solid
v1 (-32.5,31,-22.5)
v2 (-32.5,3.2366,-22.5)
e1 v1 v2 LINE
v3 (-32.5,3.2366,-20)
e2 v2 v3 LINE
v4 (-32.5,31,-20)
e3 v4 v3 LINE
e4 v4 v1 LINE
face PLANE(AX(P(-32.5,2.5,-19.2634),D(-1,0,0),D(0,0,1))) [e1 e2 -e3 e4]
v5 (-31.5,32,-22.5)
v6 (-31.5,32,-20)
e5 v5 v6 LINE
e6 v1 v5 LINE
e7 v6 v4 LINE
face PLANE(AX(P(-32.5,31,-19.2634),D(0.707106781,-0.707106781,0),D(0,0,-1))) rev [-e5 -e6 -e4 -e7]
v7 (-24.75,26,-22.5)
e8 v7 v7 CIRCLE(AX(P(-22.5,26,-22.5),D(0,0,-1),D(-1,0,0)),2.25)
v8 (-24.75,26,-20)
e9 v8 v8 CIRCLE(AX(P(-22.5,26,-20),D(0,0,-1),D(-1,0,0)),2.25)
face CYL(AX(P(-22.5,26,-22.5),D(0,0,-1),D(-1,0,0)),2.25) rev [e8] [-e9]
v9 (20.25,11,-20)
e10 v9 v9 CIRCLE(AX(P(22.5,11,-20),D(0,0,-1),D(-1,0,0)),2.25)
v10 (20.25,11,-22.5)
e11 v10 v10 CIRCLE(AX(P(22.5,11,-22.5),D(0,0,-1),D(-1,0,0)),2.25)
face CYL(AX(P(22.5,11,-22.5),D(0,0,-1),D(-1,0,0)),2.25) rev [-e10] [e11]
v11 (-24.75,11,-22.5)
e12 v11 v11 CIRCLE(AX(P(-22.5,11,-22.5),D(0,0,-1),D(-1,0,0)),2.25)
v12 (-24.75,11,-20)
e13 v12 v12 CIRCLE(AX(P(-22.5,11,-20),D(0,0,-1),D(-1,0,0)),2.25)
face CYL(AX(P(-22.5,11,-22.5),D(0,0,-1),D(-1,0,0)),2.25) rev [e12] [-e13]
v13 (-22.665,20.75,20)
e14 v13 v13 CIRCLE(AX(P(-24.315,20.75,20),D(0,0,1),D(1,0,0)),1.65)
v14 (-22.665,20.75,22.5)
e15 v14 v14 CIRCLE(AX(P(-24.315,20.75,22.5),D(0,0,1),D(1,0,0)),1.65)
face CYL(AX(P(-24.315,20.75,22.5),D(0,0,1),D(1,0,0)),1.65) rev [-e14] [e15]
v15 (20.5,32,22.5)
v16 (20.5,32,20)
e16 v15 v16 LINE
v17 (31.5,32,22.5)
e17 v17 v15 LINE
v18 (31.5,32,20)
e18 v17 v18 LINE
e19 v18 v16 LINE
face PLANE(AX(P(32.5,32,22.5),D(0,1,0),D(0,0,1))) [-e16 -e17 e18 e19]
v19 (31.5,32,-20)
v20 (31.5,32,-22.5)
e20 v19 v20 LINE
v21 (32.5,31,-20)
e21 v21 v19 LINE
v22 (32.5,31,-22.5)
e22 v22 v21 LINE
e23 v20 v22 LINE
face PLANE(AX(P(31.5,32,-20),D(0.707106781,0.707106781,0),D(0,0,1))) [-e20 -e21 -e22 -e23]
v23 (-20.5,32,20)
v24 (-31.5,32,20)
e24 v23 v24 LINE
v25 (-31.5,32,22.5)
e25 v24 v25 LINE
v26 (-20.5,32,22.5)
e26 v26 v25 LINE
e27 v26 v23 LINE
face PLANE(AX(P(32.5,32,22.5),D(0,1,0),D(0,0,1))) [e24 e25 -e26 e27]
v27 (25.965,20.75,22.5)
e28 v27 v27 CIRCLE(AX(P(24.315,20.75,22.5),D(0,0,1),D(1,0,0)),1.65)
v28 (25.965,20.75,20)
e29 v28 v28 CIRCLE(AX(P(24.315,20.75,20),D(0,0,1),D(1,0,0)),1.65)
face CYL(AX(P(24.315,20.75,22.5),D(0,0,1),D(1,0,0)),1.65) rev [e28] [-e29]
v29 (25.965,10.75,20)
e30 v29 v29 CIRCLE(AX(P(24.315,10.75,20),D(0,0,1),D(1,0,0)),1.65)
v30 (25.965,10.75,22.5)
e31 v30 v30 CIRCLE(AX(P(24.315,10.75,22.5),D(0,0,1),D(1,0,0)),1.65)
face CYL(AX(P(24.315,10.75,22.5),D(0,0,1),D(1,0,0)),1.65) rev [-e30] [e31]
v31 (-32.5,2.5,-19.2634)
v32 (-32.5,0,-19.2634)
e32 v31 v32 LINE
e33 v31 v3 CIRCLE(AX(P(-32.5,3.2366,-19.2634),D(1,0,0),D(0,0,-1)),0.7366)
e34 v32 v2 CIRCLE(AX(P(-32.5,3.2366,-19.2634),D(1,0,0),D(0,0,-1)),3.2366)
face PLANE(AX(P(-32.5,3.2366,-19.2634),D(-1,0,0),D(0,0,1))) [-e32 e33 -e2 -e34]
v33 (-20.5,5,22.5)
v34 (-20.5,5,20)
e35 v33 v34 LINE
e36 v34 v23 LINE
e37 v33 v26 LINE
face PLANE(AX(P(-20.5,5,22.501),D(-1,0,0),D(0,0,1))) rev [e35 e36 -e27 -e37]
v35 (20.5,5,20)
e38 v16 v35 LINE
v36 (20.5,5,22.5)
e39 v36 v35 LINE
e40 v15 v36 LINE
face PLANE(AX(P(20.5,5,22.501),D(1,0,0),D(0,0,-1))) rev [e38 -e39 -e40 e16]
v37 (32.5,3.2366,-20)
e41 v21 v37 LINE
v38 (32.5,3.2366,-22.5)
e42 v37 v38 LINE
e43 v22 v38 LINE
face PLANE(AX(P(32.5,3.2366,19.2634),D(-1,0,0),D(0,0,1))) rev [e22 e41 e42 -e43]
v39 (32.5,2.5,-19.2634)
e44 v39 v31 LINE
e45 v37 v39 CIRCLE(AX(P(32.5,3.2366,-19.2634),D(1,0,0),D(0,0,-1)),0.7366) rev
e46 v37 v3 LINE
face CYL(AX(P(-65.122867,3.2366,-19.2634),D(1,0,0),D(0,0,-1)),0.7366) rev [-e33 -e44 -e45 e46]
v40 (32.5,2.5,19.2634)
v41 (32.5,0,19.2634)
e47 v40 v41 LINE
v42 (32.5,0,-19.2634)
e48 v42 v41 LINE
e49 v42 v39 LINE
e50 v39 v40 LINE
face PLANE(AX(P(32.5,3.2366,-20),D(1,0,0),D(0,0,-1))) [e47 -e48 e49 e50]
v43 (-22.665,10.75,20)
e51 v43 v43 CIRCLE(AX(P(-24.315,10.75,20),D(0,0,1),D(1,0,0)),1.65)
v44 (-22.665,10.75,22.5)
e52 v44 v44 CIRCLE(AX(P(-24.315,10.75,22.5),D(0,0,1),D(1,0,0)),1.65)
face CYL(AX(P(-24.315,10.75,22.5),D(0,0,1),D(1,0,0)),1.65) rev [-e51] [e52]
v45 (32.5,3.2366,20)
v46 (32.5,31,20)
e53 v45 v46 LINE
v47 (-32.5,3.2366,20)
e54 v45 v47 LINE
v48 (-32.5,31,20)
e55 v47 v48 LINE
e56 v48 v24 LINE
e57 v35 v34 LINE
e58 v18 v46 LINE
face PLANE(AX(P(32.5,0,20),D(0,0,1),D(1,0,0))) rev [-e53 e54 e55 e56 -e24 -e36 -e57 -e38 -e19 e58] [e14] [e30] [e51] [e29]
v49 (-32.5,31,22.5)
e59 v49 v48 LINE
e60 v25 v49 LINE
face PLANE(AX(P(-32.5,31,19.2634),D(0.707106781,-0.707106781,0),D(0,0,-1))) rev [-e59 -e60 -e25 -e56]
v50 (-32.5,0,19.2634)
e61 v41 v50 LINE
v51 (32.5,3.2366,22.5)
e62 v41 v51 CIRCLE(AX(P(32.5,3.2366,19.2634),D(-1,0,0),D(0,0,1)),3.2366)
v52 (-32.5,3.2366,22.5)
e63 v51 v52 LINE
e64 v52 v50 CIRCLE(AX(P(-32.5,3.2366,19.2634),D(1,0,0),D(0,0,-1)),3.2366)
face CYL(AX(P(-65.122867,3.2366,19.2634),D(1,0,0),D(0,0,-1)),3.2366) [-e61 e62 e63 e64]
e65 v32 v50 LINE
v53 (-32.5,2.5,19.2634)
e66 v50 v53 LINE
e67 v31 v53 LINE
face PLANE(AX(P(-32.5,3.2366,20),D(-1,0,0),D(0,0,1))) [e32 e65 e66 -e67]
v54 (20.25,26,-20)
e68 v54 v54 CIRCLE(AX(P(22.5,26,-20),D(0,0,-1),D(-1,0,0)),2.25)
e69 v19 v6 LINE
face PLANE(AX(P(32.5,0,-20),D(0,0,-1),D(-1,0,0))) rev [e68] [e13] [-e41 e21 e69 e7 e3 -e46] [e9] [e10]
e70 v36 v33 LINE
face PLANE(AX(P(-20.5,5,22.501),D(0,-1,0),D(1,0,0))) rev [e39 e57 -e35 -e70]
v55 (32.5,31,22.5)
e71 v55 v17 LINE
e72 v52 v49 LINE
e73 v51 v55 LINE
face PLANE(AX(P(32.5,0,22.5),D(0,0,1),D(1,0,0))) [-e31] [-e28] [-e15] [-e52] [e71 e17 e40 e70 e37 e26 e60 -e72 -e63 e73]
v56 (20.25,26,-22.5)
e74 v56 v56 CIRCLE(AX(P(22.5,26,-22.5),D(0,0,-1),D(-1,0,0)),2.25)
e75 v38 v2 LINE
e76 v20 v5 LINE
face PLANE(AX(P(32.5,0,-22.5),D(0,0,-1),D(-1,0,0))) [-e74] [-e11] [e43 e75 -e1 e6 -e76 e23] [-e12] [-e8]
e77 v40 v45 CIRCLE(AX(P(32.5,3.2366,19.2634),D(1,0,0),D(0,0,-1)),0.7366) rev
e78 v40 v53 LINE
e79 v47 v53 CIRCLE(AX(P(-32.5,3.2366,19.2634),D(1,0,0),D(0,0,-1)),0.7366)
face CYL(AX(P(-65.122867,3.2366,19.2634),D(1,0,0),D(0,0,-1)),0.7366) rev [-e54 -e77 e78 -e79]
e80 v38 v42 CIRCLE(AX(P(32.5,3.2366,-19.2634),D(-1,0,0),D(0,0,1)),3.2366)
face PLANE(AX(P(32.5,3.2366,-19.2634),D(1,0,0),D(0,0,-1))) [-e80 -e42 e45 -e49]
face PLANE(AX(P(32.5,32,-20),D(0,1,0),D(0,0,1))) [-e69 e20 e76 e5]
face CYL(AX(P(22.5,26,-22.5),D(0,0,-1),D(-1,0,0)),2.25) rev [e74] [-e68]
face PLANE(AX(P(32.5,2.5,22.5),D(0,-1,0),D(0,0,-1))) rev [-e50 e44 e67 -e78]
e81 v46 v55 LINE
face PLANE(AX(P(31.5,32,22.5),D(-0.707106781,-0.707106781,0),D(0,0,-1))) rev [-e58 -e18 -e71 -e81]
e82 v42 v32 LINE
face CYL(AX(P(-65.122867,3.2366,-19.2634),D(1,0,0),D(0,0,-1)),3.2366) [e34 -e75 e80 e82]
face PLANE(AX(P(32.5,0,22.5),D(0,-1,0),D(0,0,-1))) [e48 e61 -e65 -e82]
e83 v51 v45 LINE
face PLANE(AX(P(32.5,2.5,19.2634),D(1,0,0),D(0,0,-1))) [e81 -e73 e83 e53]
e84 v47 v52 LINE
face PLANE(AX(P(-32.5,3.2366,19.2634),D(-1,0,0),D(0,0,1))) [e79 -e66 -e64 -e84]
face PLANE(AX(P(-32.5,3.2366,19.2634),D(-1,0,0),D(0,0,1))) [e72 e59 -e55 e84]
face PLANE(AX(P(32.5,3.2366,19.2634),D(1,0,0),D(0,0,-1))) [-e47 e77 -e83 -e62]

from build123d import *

# Parameters (mm, degrees)
SM_BASE_FLANGE_1_DEPTH      = 32.5
HOLE_WIZARD_M4_1_D          = 3.3
HOLE_WIZARD_M4_1_DEPTH      = 11.5
HOLE_WIZARD_M4_1_TIP        = 0.991420021
OTHER_START                 = -32.5
OTHER_1_DEPTH               = 65
OTHER_1_2_DEPTH             = 65
CUT_EXTRUDE_1_REACH         = 79.484
SKETCH_11_W                 = 41
SKETCH_11_H                 = 27
OTHER_1_3_DEPTH             = 65
OTHER_1_3_2_DEPTH           = 65
HOLE_WIZARD_4_5_4_5_1_D     = 4.5
HOLE_WIZARD_4_5_4_5_1_DEPTH = 2.5
CHAMFER_1_SIZE              = 1


# Read off the part's stored shape, not the designer's step: 展开1, 折叠1
# Sheet-metal steps are written as plain solids
with BuildPart() as part:
    # Sketch 1 → 基体-法兰1 (new, symmetric)
    with BuildSketch(Plane(origin=(0, 0, 0), x_dir=(0, 0, -1), z_dir=(1, 0, 0))):
        with BuildLine():
            Line((-22.5, 32), (-22.5, 3.2366))
            ThreePointArc((-22.5, 3.2366), (-21.552021808, 0.947978192), (-19.2634, 0))
            Line((-19.2634, 0), (19.2634, 0))
            ThreePointArc((19.2634, 0), (21.552021808, 0.947978192), (22.5, 3.2366))
            Line((22.5, 3.2366), (22.5, 32))
            Line((22.5, 32), (20, 32))
            Line((20, 32), (20, 3.2366))
            ThreePointArc((20, 3.2366), (19.784254855, 2.715745145), (19.2634, 2.5))
            Line((19.2634, 2.5), (-19.2634, 2.5))
            ThreePointArc((-19.2634, 2.5), (-19.784254855, 2.715745145), (-20, 3.2366))
            Line((-20, 3.2366), (-20, 32))
            Line((-20, 32), (-22.5, 32))
        make_face()
    extrude(amount=SM_BASE_FLANGE_1_DEPTH, both=True)

    # M4 螺纹孔1
    with Locations(Plane(origin=(0, 6, 22.5), x_dir=(1, 0, 0), z_dir=(0, 0, 1))):
        with Locations((-24.315, 14.75), (-24.315, 4.75), (24.315, 14.75), (24.315, 4.75)):
            Hole(HOLE_WIZARD_M4_1_D / 2, depth=HOLE_WIZARD_M4_1_DEPTH)
            with Locations((0, 0, -(HOLE_WIZARD_M4_1_DEPTH + HOLE_WIZARD_M4_1_TIP / 2))):  # 118° drill point
                Cone(0, HOLE_WIZARD_M4_1_D / 2, HOLE_WIZARD_M4_1_TIP, mode=Mode.SUBTRACT)

    # Other 1 outline → Other 1 (cut)
    with BuildSketch(Plane.YZ.offset(OTHER_START)):
        with BuildLine():
            Line((3.2366, 20), (0.084933774, 20))
            ThreePointArc((0.084933774, 20), (0.021303554, 19.634140241), (0, 19.2634))
            Line((0, 19.2634), (0, -19.2634))
            ThreePointArc((0, -19.2634), (0.947978192, -21.552021808), (3.2366, -22.5))
            Line((3.2366, -22.5), (32, -22.5))
            Line((32, -22.5), (32, -20))
            Line((32, -20), (3.2366, -20))
            ThreePointArc((3.2366, -20), (2.715745145, -19.784254855), (2.5, -19.2634))
            Line((2.5, -19.2634), (2.5, 19.2634))
            ThreePointArc((2.5, 19.2634), (2.715745145, 19.784254855), (3.2366, 20))
        make_face()
    extrude(amount=OTHER_1_DEPTH, mode=Mode.SUBTRACT)

    # Other 1 2 outline → Other 1 2 (add)
    with BuildSketch(Plane.YZ.offset(OTHER_START)):
        with BuildLine():
            Line((3.2366, 22.5), (-70.294687966, 22.5))
            Line((-70.294687966, 22.5), (-70.294687966, 20))
            Line((-70.294687966, 20), (0.084933774, 20))
            ThreePointArc((0.084933774, 20), (1.225195018, 21.799110859), (3.2366, 22.5))
        make_face()
    extrude(amount=OTHER_1_2_DEPTH)

    # 草图11 → 切除-拉伸1 (cut, up to next)
    with BuildSketch(Plane(origin=(0, 0, 20), x_dir=(-1, 0, 0), z_dir=(0, 0, -1)), mode=Mode.PRIVATE) as cut_extrude_1_sk1:
        with Locations((0, 18.5)):
            Rectangle(SKETCH_11_W, SKETCH_11_H)
    cut_extrude_1_tool1 = extrude(cut_extrude_1_sk1.sketch, amount=-CUT_EXTRUDE_1_REACH, mode=Mode.PRIVATE) & part.part
    add(cut_extrude_1_tool1.solids().sort_by_distance((0, 18.5, 20))[0], mode=Mode.SUBTRACT)

    # Other 1 3 outline → Other 1 3 (cut)
    with BuildSketch(Plane.YZ.offset(OTHER_START)):
        with BuildLine():
            Line((-70.294687966, 20), (0.084933774, 20))
            ThreePointArc((0.084933774, 20), (1.225195018, 21.799110859), (3.2366, 22.5))
            Line((3.2366, 22.5), (-70.294687966, 22.5))
            Line((-70.294687966, 22.5), (-70.294687966, 20))
        make_face()
    extrude(amount=OTHER_1_3_DEPTH, mode=Mode.SUBTRACT)

    # Other 1 3 2 outline → Other 1 3 2 (add)
    with BuildSketch(Plane.YZ.offset(OTHER_START)):
        with BuildLine():
            ThreePointArc((0.084933774, 20), (0.021303554, 19.634140241), (0, 19.2634))
            Line((0, 19.2634), (0, -19.2634))
            ThreePointArc((0, -19.2634), (0.947978192, -21.552021808), (3.2366, -22.5))
            Line((3.2366, -22.5), (32, -22.5))
            Line((32, -22.5), (32, -20))
            Line((32, -20), (3.2366, -20))
            ThreePointArc((3.2366, -20), (2.715745145, -19.784254855), (2.5, -19.2634))
            Line((2.5, -19.2634), (2.5, 19.2634))
            ThreePointArc((2.5, 19.2634), (2.715745145, 19.784254855), (3.2366, 20))
            Line((3.2366, 20), (0.084933774, 20))
        make_face()
    extrude(amount=OTHER_1_3_2_DEPTH)

    # Ø4.5 (4.5) 直径孔1
    with Locations(Plane(origin=(0, 0, -22.5), x_dir=(-1, 0, 0), z_dir=(0, 0, -1))):
        with Locations((-22.5, 26), (-22.5, 11), (22.5, 26), (22.5, 11)):
            Hole(HOLE_WIZARD_4_5_4_5_1_D / 2, depth=HOLE_WIZARD_4_5_4_5_1_DEPTH)

    # 倒角1
    chamfer_1_edges = [part.edges().sort_by_distance(p)[0] for p in [
        (32.5, 32, 21.25),
        (-32.5, 32, 21.25),
        (32.5, 32, -21.25),
        (-32.5, 32, -21.25),
    ]]
    chamfer(chamfer_1_edges, length=CHAMFER_1_SIZE)


solid = part.part
